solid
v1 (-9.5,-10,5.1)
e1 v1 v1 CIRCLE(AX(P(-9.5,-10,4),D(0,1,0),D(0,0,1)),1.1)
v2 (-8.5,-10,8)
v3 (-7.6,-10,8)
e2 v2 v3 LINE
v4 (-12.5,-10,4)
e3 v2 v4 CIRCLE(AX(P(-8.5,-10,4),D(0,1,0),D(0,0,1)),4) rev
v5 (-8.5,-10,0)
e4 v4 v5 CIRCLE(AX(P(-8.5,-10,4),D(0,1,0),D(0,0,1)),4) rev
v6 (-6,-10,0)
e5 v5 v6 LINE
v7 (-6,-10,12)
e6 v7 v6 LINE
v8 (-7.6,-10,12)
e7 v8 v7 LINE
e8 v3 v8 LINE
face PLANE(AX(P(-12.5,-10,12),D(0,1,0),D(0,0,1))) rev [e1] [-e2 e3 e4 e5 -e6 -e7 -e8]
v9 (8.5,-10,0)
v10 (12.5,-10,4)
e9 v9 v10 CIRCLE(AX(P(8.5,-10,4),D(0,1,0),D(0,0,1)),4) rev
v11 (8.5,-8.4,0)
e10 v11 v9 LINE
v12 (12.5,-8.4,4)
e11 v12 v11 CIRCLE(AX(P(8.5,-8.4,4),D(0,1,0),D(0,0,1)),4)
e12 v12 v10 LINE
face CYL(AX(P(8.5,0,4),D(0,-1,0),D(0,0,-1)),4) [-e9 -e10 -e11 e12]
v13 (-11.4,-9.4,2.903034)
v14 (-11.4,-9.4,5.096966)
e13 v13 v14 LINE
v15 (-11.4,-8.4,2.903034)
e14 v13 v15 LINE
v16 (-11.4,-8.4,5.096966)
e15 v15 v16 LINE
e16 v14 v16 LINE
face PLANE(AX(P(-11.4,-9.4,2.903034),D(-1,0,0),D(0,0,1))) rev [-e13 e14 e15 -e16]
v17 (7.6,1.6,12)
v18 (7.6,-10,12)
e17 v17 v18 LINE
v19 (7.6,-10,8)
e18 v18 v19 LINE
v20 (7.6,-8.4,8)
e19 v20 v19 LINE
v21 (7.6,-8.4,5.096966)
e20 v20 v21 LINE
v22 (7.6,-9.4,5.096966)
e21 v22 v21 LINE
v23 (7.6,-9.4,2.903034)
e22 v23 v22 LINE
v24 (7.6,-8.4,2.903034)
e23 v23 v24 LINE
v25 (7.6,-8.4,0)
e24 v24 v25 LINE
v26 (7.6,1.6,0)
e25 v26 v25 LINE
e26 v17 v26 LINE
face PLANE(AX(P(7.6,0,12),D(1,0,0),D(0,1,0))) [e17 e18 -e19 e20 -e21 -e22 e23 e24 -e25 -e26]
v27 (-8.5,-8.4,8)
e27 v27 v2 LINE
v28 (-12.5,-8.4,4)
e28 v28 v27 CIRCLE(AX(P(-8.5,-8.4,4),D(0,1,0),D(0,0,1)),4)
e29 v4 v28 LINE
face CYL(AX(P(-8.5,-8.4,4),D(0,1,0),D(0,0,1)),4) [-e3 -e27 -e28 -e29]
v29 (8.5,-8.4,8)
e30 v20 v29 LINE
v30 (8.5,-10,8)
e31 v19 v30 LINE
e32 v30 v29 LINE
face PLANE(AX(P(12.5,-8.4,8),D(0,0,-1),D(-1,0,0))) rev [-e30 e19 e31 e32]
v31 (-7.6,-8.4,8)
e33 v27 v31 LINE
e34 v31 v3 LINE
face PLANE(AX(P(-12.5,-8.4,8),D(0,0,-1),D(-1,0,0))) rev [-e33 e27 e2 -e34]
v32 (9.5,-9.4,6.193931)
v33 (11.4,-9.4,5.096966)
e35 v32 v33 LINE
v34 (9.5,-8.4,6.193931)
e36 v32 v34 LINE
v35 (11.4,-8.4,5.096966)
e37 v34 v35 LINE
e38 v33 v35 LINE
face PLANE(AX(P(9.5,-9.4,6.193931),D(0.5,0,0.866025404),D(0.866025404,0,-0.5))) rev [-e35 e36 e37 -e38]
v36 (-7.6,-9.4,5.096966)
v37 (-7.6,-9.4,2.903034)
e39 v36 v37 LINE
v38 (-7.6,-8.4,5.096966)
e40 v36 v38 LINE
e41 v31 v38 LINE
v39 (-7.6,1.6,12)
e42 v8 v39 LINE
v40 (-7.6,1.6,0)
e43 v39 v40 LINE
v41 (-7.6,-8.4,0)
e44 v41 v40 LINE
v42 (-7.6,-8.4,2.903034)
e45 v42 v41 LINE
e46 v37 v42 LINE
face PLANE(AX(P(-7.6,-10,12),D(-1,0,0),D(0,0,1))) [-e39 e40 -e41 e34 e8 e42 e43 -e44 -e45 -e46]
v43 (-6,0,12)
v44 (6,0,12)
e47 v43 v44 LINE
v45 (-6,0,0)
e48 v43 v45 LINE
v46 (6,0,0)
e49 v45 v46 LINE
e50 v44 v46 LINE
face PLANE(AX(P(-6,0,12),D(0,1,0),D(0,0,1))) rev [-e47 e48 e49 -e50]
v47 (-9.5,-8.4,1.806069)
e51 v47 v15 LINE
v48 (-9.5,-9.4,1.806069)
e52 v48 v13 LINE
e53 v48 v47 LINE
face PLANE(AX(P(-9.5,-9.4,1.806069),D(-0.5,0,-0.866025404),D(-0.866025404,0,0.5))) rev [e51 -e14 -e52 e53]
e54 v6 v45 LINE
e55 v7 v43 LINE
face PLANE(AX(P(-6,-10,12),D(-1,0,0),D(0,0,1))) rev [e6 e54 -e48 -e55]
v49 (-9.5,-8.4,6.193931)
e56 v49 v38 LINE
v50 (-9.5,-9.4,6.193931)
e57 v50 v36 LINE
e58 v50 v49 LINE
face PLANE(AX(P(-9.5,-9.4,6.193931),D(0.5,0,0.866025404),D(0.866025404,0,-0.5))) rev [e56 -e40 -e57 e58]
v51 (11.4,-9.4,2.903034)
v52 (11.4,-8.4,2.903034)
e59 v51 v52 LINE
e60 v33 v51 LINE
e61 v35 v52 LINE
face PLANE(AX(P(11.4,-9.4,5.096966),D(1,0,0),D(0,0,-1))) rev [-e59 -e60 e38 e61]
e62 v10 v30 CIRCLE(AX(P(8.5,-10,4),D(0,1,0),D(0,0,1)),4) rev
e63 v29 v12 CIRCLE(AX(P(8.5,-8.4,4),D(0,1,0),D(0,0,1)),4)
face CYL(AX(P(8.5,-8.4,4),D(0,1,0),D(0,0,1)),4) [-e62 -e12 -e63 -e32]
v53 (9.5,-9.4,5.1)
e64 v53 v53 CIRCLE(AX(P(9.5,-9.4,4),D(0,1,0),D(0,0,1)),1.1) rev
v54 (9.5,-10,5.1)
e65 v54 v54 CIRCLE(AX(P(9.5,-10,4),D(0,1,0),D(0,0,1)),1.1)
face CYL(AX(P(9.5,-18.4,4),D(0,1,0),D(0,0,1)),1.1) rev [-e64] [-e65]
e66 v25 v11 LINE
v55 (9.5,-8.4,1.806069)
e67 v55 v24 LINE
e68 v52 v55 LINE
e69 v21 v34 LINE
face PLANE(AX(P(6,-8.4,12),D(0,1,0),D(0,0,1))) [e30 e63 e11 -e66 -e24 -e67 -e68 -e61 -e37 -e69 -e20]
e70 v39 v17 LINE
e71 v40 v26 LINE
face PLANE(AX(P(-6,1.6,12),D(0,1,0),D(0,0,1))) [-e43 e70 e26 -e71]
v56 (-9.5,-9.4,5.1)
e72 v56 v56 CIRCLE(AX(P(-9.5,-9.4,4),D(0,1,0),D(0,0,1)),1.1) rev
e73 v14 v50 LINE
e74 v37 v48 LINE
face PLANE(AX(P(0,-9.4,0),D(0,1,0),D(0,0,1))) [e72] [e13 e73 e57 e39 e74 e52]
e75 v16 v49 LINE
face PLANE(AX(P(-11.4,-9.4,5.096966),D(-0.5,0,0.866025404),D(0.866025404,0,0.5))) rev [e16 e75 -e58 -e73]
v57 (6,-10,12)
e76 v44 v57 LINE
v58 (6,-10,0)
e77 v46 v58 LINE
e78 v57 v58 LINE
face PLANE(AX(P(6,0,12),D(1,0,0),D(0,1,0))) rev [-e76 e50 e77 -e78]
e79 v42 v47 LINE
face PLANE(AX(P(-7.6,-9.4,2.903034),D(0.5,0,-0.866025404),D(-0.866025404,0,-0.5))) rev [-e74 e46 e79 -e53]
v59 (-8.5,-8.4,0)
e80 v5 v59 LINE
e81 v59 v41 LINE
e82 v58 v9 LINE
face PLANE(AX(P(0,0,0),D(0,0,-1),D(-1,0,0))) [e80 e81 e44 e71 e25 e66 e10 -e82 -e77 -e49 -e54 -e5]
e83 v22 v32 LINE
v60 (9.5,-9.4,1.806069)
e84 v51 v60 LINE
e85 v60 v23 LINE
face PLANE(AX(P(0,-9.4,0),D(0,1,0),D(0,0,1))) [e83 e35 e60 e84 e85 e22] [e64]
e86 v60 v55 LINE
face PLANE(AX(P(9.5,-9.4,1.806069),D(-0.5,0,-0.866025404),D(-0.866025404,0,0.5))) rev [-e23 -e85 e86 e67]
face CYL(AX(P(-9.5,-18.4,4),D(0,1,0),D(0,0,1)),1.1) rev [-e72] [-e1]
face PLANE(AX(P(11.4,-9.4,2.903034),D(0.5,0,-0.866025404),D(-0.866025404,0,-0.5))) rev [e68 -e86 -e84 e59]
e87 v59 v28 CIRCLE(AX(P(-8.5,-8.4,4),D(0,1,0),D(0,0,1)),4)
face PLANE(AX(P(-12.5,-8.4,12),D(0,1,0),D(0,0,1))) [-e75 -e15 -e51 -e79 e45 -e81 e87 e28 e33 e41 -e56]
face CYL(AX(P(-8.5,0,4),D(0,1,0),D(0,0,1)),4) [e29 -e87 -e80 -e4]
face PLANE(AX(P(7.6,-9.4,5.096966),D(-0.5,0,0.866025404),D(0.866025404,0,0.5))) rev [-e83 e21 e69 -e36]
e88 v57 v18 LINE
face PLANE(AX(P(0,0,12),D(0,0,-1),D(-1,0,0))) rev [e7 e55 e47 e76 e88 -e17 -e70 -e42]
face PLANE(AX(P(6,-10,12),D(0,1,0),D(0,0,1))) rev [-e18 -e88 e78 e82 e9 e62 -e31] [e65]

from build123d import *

# Parameters (mm, degrees)
EXTRUDE_1_DEPTH     = 12
SKETCH_2_R          = 1.1
CUT_EXTRUDE_1_DEPTH = 10
SKETCH_3_W          = 4.9
SKETCH_3_H          = 4
CUT_EXTRUDE_2_DEPTH = 1.6
FILLET_1_R          = 4
CUT_EXTRUDE_3_DEPTH = 1


with BuildPart() as part:
    # 草圖1 → 伸長-薄件1 (new body)
    with BuildSketch(Plane.XY):
        Polygon((-12.5, -10), (-6, -10), (-6, 0), (6, 0), (6, -10), (12.5, -10), (12.5, -8.4), (7.6, -8.4), (7.6, 1.6), (-7.6, 1.6), (-7.6, -8.4), (-12.5, -8.4), align=None)
    extrude(amount=EXTRUDE_1_DEPTH)

    # 草圖2 → 除料-伸長1 (cut)
    with BuildSketch(Plane(origin=(0, -8.4, 0), x_dir=(1, 0, 0), z_dir=(0, 1, 0))):
        with Locations(Location((9.5, -4, 0), (0, 0, 270))):
            Circle(SKETCH_2_R)
        with Locations(Location((-9.5, -4, 0), (0, 0, 270))):
            Circle(SKETCH_2_R)
    extrude(amount=-CUT_EXTRUDE_1_DEPTH, mode=Mode.SUBTRACT)

    # 草圖3 → 除料-伸長2 (cut)
    with BuildSketch(Plane.XZ.offset(10)):
        with Locations((-10.05, 10)):
            Rectangle(SKETCH_3_W, SKETCH_3_H)
        with Locations((10.05, 10)):
            Rectangle(SKETCH_3_W, SKETCH_3_H)
    extrude(amount=-CUT_EXTRUDE_2_DEPTH, mode=Mode.SUBTRACT)

    # 圓角1
    fillet_1_edges = [part.edges().sort_by_distance(p)[0] for p in [
        (-12.5, -9.2, 0),
        (-12.5, -9.2, 8),
        (12.5, -9.2, 0),
        (12.5, -9.2, 8),
    ]]
    fillet(fillet_1_edges, radius=FILLET_1_R - 0.0001)  # a hair under: the kernel refuses the full size

    # 草圖4 → 除料-伸長3 (cut)
    with BuildSketch(Plane(origin=(0, -8.4, 0), x_dir=(1, 0, 0), z_dir=(0, 1, 0))):
        Polygon((-7.6, -5.096965511), (-7.6, -2.903034489), (-9.5, -1.806068977), (-11.4, -2.903034489), (-11.4, -5.096965511), (-9.5, -6.193931023), align=None)
        Polygon((7.6, -5.096965511), (9.5, -6.193931023), (11.4, -5.096965511), (11.4, -2.903034489), (9.5, -1.806068977), (7.6, -2.903034489), align=None)
    extrude(amount=-CUT_EXTRUDE_3_DEPTH, mode=Mode.SUBTRACT)


solid = part.part
